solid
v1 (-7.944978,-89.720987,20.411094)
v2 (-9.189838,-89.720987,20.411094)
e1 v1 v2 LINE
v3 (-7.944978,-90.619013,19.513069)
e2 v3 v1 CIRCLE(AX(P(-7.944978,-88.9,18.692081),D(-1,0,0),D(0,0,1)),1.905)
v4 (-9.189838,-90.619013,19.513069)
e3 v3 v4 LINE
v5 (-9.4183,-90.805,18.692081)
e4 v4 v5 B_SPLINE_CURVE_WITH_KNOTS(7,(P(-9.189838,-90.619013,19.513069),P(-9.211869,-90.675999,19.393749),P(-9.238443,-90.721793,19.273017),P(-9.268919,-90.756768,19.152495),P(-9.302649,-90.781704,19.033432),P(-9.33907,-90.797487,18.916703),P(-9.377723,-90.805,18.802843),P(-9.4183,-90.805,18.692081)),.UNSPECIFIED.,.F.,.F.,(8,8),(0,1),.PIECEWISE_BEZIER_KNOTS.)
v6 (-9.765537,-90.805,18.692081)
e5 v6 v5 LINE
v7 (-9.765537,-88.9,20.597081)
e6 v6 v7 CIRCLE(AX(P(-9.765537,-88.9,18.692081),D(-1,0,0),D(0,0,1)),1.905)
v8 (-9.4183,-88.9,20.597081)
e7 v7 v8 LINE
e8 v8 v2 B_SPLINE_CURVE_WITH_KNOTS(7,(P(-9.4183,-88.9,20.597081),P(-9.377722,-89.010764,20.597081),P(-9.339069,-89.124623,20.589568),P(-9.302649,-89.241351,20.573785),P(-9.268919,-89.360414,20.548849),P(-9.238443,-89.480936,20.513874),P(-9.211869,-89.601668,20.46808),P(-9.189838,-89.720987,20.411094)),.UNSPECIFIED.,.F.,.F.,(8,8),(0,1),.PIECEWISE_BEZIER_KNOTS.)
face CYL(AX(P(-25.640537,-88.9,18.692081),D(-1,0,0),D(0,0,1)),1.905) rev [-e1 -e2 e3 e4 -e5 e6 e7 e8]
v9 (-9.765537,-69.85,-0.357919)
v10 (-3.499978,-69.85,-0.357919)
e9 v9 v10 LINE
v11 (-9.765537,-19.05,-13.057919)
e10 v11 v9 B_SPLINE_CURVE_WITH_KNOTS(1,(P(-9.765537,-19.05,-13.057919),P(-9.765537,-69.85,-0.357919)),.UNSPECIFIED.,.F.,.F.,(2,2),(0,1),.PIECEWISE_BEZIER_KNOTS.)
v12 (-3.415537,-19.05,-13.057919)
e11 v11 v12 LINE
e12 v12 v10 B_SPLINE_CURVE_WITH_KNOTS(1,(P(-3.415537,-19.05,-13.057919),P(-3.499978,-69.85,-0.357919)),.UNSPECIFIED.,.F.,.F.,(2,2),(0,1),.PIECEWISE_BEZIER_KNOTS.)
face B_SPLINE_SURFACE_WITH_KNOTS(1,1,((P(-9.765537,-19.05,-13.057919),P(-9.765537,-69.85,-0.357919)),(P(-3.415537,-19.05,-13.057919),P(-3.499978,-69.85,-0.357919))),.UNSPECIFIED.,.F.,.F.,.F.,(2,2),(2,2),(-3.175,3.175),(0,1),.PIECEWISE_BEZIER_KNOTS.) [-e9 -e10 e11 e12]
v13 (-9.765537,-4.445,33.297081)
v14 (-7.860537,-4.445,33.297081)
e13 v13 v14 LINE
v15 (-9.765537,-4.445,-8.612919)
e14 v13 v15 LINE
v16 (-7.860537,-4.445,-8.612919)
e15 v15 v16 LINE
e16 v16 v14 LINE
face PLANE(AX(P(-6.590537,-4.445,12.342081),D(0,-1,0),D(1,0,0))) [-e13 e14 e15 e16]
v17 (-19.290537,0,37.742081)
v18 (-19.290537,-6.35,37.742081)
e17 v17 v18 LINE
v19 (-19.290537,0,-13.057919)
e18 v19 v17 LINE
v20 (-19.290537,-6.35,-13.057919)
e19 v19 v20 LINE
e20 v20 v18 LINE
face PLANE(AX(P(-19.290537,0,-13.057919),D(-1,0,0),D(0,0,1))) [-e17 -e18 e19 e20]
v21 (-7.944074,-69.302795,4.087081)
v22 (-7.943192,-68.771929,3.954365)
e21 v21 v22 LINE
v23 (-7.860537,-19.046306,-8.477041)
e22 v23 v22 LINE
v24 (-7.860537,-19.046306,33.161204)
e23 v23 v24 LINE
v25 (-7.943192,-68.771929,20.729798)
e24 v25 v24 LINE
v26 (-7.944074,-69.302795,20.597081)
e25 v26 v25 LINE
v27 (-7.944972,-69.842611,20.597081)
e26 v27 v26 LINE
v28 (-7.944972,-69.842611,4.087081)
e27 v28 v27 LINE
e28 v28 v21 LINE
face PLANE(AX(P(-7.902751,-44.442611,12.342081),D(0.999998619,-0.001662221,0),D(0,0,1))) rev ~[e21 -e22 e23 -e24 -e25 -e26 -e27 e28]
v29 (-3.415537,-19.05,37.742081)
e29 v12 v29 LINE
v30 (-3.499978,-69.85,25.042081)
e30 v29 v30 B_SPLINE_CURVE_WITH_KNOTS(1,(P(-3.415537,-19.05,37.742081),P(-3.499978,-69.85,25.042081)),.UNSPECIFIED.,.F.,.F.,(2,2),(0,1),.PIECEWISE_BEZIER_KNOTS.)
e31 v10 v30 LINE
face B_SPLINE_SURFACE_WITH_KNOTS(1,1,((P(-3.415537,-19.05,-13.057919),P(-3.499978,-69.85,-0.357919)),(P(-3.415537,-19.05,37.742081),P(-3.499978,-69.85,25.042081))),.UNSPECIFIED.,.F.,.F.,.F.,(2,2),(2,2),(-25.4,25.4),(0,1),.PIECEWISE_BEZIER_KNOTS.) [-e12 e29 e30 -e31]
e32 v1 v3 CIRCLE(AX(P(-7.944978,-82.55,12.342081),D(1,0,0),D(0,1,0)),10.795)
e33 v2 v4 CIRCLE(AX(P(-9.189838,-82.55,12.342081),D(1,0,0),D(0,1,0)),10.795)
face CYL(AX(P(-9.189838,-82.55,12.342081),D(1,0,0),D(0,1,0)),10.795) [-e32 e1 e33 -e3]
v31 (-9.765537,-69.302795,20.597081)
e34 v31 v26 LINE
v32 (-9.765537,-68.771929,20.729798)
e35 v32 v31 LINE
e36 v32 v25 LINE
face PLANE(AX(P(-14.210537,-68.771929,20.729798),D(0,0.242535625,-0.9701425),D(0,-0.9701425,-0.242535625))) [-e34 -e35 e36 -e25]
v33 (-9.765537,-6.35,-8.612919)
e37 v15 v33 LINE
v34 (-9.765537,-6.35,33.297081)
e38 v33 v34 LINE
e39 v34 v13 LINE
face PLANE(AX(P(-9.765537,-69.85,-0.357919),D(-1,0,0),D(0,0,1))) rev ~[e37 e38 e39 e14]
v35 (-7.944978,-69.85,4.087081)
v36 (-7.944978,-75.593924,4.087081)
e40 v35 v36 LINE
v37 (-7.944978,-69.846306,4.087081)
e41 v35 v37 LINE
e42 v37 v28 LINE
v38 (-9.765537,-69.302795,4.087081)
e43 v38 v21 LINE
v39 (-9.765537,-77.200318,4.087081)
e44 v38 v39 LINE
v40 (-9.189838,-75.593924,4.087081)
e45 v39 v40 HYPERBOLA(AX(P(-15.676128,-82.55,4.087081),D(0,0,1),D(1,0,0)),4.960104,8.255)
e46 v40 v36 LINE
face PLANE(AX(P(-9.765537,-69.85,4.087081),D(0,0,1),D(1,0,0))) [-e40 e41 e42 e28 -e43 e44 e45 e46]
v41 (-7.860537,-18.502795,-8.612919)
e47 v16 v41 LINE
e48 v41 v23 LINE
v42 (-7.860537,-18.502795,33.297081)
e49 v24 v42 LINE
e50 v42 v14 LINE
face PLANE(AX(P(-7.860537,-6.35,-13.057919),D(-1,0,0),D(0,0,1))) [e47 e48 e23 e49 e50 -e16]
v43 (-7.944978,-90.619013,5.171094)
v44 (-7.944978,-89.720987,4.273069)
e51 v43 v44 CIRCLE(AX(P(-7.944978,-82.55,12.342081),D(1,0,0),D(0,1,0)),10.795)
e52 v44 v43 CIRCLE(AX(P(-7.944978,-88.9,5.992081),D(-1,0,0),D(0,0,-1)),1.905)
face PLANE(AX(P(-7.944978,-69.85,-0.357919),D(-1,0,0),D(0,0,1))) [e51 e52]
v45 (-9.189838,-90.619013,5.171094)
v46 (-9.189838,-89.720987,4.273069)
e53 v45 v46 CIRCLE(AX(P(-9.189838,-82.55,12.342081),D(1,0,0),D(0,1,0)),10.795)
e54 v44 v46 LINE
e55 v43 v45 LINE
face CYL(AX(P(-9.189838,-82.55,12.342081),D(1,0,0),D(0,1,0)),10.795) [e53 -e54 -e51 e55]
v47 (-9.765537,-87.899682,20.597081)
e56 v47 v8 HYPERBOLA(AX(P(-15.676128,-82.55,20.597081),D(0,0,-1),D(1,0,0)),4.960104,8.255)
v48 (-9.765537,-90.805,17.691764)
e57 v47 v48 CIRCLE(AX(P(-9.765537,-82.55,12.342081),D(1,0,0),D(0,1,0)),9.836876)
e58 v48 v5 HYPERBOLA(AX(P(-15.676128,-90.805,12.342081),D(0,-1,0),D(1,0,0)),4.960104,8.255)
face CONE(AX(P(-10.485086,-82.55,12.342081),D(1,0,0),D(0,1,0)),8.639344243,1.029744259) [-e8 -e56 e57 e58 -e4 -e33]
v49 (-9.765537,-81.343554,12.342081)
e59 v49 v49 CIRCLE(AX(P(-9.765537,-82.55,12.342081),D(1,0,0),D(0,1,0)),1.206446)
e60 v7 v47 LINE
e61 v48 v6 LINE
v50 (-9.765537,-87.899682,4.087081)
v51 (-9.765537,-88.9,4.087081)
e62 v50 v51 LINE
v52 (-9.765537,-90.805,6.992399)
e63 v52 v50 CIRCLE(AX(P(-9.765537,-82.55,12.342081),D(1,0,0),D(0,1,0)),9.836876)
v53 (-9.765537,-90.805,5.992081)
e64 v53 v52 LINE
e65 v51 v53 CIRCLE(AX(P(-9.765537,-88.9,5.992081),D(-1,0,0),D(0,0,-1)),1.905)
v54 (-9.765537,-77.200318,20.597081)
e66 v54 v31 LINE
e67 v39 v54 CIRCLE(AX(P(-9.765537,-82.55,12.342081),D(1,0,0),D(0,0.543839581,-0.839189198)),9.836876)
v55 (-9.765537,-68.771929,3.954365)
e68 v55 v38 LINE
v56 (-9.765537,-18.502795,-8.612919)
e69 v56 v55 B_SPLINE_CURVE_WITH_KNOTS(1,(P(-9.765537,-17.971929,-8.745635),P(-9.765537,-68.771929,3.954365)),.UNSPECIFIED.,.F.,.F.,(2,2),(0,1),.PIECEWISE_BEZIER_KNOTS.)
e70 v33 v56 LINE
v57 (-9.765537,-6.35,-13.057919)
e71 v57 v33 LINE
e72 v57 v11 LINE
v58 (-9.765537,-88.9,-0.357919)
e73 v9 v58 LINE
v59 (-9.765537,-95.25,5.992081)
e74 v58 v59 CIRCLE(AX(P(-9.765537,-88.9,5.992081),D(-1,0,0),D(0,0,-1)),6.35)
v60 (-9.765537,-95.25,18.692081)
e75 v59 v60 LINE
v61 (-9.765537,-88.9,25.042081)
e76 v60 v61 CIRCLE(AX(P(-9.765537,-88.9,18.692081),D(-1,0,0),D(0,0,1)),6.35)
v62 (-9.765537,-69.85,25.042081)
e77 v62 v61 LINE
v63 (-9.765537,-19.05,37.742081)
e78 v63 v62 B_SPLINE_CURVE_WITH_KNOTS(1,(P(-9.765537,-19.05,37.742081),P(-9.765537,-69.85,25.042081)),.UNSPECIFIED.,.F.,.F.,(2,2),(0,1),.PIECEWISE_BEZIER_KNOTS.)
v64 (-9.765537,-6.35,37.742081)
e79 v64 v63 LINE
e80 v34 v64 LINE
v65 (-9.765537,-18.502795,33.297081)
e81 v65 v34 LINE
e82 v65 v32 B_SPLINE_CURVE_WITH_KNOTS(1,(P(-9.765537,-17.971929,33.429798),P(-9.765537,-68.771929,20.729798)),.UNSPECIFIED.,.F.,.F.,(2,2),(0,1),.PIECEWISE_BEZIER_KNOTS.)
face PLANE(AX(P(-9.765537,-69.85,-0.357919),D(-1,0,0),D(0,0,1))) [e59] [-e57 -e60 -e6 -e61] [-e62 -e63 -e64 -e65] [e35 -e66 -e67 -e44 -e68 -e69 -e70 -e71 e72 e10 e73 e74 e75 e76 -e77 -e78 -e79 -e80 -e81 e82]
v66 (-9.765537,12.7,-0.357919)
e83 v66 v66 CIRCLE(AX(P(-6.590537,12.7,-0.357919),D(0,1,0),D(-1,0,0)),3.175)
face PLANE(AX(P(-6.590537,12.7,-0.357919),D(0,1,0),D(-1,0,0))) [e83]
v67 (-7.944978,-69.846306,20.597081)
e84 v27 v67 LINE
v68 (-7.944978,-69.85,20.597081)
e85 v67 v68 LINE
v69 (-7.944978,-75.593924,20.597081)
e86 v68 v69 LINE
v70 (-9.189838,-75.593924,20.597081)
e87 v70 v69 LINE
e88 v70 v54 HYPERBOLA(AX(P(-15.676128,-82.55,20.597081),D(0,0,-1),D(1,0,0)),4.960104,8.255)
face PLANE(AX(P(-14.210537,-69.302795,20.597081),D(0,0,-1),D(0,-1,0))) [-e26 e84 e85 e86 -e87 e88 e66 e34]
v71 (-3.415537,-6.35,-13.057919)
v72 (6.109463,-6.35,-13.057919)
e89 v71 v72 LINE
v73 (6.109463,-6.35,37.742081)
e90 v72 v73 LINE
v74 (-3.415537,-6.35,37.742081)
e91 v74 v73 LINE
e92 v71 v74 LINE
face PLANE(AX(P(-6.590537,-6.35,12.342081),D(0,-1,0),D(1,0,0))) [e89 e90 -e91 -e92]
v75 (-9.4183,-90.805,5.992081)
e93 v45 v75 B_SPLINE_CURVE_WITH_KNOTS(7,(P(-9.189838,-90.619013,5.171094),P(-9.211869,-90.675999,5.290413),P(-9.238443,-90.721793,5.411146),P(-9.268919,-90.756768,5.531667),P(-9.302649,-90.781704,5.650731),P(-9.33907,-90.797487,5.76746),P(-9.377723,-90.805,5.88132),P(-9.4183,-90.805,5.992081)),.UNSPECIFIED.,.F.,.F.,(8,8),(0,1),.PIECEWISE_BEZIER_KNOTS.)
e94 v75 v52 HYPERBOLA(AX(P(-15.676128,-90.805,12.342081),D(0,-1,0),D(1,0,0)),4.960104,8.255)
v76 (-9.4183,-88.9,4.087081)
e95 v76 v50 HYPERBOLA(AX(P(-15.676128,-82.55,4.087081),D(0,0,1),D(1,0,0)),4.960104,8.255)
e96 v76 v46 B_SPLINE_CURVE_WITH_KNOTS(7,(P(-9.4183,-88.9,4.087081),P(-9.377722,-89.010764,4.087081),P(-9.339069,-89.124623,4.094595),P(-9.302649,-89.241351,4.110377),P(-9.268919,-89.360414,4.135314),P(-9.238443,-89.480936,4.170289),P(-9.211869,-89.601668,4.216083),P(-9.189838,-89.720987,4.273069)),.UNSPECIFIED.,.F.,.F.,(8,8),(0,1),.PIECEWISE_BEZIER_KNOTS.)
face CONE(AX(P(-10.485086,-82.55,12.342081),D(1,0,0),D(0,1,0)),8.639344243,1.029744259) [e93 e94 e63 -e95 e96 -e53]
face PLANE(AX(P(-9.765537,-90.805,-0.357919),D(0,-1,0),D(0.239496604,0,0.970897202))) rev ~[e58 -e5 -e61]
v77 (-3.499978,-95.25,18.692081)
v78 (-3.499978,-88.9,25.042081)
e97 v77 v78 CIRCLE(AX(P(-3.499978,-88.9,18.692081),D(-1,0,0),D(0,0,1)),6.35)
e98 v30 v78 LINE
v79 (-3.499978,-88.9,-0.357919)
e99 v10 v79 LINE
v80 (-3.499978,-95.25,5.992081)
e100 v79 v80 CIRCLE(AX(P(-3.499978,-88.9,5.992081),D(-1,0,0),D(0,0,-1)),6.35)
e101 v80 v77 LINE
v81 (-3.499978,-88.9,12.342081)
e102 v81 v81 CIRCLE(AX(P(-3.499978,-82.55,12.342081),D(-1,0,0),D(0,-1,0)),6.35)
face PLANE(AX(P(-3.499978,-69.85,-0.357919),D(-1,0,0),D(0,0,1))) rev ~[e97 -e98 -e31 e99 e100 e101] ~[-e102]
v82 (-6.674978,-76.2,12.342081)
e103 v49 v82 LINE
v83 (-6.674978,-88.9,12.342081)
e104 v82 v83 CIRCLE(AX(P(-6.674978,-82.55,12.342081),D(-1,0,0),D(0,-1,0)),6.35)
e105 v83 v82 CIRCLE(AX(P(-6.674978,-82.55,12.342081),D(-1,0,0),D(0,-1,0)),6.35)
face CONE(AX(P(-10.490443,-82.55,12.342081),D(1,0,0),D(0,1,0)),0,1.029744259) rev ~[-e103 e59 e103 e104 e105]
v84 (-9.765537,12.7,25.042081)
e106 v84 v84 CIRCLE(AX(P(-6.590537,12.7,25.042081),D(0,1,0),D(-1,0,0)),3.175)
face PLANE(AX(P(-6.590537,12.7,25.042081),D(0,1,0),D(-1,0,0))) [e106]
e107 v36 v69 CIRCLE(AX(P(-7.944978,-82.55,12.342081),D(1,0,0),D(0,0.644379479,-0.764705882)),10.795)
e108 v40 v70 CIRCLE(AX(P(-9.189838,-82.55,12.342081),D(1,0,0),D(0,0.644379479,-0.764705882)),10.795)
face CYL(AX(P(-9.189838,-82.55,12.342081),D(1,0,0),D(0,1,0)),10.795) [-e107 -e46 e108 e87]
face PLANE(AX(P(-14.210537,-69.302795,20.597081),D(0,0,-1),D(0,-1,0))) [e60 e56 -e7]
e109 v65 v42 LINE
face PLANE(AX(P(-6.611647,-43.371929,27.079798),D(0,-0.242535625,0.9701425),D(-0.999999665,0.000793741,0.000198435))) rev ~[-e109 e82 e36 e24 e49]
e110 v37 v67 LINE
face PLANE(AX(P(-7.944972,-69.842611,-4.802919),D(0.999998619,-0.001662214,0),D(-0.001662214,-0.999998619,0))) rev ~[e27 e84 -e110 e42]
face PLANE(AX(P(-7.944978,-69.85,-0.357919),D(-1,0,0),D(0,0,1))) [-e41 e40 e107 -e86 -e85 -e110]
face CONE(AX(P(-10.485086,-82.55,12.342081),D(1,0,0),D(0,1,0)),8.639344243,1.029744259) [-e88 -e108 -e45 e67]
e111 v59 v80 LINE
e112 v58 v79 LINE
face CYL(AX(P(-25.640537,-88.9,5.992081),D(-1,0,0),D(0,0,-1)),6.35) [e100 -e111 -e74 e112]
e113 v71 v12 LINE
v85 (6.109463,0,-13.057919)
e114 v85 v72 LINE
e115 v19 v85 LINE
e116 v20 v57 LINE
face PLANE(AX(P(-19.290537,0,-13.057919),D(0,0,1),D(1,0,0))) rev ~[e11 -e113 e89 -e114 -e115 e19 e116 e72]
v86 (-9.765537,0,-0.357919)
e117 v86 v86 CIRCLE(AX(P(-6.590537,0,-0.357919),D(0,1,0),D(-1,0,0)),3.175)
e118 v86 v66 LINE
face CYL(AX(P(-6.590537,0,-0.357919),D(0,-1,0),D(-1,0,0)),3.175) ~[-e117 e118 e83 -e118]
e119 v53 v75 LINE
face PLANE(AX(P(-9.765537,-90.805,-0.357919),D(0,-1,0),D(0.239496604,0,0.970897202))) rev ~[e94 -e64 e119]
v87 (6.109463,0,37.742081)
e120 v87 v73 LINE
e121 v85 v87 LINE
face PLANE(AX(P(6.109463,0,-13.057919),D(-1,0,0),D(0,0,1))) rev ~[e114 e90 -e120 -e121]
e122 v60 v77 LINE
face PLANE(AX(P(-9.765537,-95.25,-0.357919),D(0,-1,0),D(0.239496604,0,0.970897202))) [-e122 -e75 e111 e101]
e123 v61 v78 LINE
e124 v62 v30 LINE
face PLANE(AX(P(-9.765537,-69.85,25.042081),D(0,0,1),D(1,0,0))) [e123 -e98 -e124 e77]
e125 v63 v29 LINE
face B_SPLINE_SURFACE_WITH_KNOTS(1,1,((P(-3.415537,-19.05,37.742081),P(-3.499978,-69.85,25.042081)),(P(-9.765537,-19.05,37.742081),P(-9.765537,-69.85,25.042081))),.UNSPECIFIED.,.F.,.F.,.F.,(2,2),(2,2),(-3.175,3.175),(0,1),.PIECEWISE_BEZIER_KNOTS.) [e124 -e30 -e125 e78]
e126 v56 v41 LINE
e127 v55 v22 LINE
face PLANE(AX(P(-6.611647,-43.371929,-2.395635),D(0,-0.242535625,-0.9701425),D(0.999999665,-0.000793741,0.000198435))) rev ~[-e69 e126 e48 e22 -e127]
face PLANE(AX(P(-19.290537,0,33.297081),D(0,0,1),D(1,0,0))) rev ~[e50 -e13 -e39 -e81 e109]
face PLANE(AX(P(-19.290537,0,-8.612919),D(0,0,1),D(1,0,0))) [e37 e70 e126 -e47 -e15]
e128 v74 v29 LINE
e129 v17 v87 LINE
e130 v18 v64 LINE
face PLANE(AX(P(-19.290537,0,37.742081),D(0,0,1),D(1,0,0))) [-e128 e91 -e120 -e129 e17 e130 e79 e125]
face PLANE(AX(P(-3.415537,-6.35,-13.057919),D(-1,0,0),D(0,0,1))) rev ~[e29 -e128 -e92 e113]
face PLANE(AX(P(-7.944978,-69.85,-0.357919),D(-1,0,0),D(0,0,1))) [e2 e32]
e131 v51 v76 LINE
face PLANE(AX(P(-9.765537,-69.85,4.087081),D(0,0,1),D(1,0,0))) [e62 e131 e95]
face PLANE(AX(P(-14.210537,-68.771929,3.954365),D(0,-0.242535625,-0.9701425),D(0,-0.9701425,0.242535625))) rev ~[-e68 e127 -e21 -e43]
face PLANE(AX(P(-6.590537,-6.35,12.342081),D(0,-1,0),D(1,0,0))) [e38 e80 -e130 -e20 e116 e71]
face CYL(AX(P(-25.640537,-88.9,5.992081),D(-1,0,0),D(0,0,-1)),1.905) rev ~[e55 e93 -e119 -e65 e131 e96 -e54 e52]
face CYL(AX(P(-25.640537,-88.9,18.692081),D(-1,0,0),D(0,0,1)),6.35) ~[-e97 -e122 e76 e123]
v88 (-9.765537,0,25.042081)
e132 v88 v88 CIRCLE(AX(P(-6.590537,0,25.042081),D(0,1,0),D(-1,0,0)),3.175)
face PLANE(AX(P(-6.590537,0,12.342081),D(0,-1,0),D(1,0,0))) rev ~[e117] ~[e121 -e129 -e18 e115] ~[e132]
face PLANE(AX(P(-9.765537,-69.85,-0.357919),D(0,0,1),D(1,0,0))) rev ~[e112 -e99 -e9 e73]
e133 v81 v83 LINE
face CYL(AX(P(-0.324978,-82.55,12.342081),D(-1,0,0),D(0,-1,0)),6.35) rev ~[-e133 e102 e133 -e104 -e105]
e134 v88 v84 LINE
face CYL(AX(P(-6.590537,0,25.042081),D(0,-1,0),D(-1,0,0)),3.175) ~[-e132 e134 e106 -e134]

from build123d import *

# Parameters (mm, degrees)
F0_W         = 25.4
F0_H         = 50.8
F1_DEPTH     = 6.35
F2_W         = 6.35
F2_H         = 50.8
F3_DEPTH     = 12.7
F3_FACE_W    = 6.35
F3_FACE_H    = 50.8
F5_W         = 6.2655590393
F5_H         = 25.4
F7_DEPTH     = 25.4
F8_T1_DEPTH  = 38.0155590393
F10_D        = 12.7
F10_DEPTH    = 3.175
F10_TIP      = 3.8154649308
F11_T        = 4.445
F11_T3_DEPTH = 59.69
F11_T5_DEPTH = 15.1555590393
F11_T7_DEPTH = 34.29
F12_R        = 3.175
F13_DEPTH    = 12.7


# Not quite as in the source:
# - a fillet or chamfer that OpenCascade refuses, or shapes differently, is made with other operations: its cross-section is extruded or revolved along the edge and cut away or added
# - a shell that OpenCascade refuses in one call is made with other operations: the cavity is built on its own and cut out


with BuildPart() as f1:
    # F0 (on Front) → F1 (new body)
    with BuildSketch(Plane.XZ):
        with Locations((-6.5905367956, 12.3420813114)):
            Rectangle(F0_W, F0_H)
    extrude(amount=F1_DEPTH)

    # F2 (on face) → F3 (join)
    with BuildSketch(Plane.XZ.offset(6.35)):
        with Locations((-6.5905367956, 12.3420813114)):
            Rectangle(F2_W, F2_H)
    extrude(amount=F3_DEPTH)

    # F3_face (on face) → F6 section 0
    with BuildSketch(Plane(origin=(-6.5905367956, -19.05, 12.3420813114), x_dir=(1, 0, 0), z_dir=(0, -1, 0))):
        Rectangle(F3_FACE_W, F3_FACE_H)
    # F5 (on offset) → F6 section 1
    with BuildSketch(Plane.XZ.offset(69.85)):
        with Locations((-6.6327572759, 12.3420813114)):
            Rectangle(F5_W, F5_H)
    loft()

    # F7 (add): a face of the model
    f7_faces = [f1.faces().sort_by_distance(p)[0] for p in [
        (-6.6327572759, -69.85, 12.3420813114),
    ]]
    extrude(f7_faces, amount=F7_DEPTH)

    # F8: fillet of radius 6.35 on 4 edges, made by hand

    # F8_s2 → F8_t1 (cut)
    with BuildSketch(Plane.YZ.offset(-25.6405367956)):
        with BuildLine():
            ThreePointArc((-88.9, 25.0420813114), (-93.3901280605, 23.1822093719), (-95.25, 18.6920813114))
            Line((-95.25, 18.6920813114), (-95.25, 25.0420813114))
            Line((-95.25, 25.0420813114), (-88.9, 25.0420813114))
        make_face()
        with BuildLine():
            ThreePointArc((-88.9, -0.3579186886), (-93.3901280605, 1.5019532508), (-95.25, 5.9920813114))
            Line((-95.25, 5.9920813114), (-95.25, -0.3579186886))
            Line((-95.25, -0.3579186886), (-88.9, -0.3579186886))
        make_face()
    extrude(amount=F8_T1_DEPTH, mode=Mode.SUBTRACT)

    # F10
    with Locations(Plane.YZ.offset(-3.4999777563)):
        with Locations((-82.55, 12.3420813114)):
            Hole(F10_D / 2, depth=F10_DEPTH)
            with Locations((0, 0, -(F10_DEPTH + F10_TIP / 2))):  # 118° drill point
                Cone(0, F10_D / 2, F10_TIP, mode=Mode.SUBTRACT)

    # F11: shell of thickness 4.445, made by hand


with BuildPart() as f11_core1:
    # F11_t2: copy of F1
    add(f1.part)

    # the walls: a layer under each face that stays
    f11_faces = [f11_core1.faces().sort_by_distance(p)[0] for p in [
        (-19.2905367956, -3.175, 12.3420813114),
        (-6.5905367956, -9.525, 37.7420813114),
        (-6.5905367956, -9.525, -13.0579186886),
        (-6.5905367956, 0, 12.3420813114),
        (-14.5280367956, -6.35, 12.3420813114),
        (6.1094632044, -3.175, 12.3420813114),
        (1.3469632044, -6.35, 12.3420813114),
        (-3.4155367956, -12.7, 12.3420813114),
        (-6.6116470357, -44.45, 31.3920813114),
        (-6.6116470357, -44.45, -6.7079186886),
        (-3.4577572759, -44.45, 12.3420813114),
        (-6.6327572759, -79.375, 25.0420813114),
        (-6.6327572759, -79.375, -0.3579186886),
        (-6.6327572759, -93.3901280605, 23.1822093719),
        (-6.6327572759, -93.3901280606, 1.5019532508),
        (-6.6327572759, -95.25, 12.3420813114),
        (-8.2202572759, -86.328223001, 12.3420813114),
        (-3.4999777563, -91.0166666667, 3.8754146447),
        (-5.0874777563, -88.9, 12.3420813114),
    ]]
    thicken(f11_faces, amount=-F11_T, mode=Mode.SUBTRACT)

    # F11_s4 → F11_t3 (cut)
    with BuildSketch(Plane.XY.offset(-17.5029186886)):
        Polygon((-3.3710867956, -6.39445), (-3.4155367956, -1.905), (-7.8605367956, -1.905), (-7.8605367956, -6.35), align=None)
    extrude(amount=F11_T3_DEPTH, mode=Mode.SUBTRACT)

    # F11_s6 → F11_t5 (cut)
    with BuildSketch(Plane.YZ.offset(-14.2105367956)):
        Polygon((-69.8607807085, 25.1296541455), (-68.7719291467, 20.7297978982), (-69.3027954941, 20.5970813114), (-69.85, 20.5970813114), align=None)
        Polygon((-69.8607807085, -0.4454915228), (-68.7719291467, 3.9543647245), (-69.3027954941, 4.0870813114), (-69.85, 4.0870813114), align=None)
    extrude(amount=F11_T5_DEPTH, mode=Mode.SUBTRACT)

    # F11_s8 → F11_t7 (cut)
    with BuildSketch(Plane.XY.offset(-4.8029186886)):
        Polygon((-3.4110778177, -69.8500738857), (-7.9449716156, -69.8426114261), (-7.9449777563, -69.8463057105), (-7.9449777563, -69.85), align=None)
    extrude(amount=F11_T7_DEPTH, mode=Mode.SUBTRACT)

    # F11_s9 → F11_t10 (revolve, cut)
    with BuildSketch(Plane.XY.offset(12.3420813114)):
        Polygon((-6.6368766698, -76.2673434424), (-10.4850864079, -73.910655757), (-9.1898377553, -71.755), (-6.6749777563, -71.755), align=None)
    revolve(axis=Axis((-6.6749777563, -82.55, 12.3420813114), (1, 0, 0)), mode=Mode.SUBTRACT)


with BuildPart() as f1_1:
    add(f1.part)

    # what is left inside the walls is the cavity
    f11_cavity = [f11_core1.part.solids().sort_by_distance(p)[0] for p in [
        (-9.721087, -28.696773, 12.342081),
        (-9.611738, -89.747742, 5.14434),
        (-9.611738, -89.747742, 19.539823),
    ]]
    add(f11_cavity, mode=Mode.SUBTRACT)

    # F12 (on face) → F13 (join)
    with BuildSketch(Plane(origin=(0, 0, 0), x_dir=(-1, 0, 0), z_dir=(0, 1, 0))):
        with Locations((6.5905367956, 25.0420813114)):
            Circle(F12_R)
        with Locations((6.5905367956, -0.3579186886)):
            Circle(F12_R)
    extrude(amount=F13_DEPTH)


solid = f1_1.part
